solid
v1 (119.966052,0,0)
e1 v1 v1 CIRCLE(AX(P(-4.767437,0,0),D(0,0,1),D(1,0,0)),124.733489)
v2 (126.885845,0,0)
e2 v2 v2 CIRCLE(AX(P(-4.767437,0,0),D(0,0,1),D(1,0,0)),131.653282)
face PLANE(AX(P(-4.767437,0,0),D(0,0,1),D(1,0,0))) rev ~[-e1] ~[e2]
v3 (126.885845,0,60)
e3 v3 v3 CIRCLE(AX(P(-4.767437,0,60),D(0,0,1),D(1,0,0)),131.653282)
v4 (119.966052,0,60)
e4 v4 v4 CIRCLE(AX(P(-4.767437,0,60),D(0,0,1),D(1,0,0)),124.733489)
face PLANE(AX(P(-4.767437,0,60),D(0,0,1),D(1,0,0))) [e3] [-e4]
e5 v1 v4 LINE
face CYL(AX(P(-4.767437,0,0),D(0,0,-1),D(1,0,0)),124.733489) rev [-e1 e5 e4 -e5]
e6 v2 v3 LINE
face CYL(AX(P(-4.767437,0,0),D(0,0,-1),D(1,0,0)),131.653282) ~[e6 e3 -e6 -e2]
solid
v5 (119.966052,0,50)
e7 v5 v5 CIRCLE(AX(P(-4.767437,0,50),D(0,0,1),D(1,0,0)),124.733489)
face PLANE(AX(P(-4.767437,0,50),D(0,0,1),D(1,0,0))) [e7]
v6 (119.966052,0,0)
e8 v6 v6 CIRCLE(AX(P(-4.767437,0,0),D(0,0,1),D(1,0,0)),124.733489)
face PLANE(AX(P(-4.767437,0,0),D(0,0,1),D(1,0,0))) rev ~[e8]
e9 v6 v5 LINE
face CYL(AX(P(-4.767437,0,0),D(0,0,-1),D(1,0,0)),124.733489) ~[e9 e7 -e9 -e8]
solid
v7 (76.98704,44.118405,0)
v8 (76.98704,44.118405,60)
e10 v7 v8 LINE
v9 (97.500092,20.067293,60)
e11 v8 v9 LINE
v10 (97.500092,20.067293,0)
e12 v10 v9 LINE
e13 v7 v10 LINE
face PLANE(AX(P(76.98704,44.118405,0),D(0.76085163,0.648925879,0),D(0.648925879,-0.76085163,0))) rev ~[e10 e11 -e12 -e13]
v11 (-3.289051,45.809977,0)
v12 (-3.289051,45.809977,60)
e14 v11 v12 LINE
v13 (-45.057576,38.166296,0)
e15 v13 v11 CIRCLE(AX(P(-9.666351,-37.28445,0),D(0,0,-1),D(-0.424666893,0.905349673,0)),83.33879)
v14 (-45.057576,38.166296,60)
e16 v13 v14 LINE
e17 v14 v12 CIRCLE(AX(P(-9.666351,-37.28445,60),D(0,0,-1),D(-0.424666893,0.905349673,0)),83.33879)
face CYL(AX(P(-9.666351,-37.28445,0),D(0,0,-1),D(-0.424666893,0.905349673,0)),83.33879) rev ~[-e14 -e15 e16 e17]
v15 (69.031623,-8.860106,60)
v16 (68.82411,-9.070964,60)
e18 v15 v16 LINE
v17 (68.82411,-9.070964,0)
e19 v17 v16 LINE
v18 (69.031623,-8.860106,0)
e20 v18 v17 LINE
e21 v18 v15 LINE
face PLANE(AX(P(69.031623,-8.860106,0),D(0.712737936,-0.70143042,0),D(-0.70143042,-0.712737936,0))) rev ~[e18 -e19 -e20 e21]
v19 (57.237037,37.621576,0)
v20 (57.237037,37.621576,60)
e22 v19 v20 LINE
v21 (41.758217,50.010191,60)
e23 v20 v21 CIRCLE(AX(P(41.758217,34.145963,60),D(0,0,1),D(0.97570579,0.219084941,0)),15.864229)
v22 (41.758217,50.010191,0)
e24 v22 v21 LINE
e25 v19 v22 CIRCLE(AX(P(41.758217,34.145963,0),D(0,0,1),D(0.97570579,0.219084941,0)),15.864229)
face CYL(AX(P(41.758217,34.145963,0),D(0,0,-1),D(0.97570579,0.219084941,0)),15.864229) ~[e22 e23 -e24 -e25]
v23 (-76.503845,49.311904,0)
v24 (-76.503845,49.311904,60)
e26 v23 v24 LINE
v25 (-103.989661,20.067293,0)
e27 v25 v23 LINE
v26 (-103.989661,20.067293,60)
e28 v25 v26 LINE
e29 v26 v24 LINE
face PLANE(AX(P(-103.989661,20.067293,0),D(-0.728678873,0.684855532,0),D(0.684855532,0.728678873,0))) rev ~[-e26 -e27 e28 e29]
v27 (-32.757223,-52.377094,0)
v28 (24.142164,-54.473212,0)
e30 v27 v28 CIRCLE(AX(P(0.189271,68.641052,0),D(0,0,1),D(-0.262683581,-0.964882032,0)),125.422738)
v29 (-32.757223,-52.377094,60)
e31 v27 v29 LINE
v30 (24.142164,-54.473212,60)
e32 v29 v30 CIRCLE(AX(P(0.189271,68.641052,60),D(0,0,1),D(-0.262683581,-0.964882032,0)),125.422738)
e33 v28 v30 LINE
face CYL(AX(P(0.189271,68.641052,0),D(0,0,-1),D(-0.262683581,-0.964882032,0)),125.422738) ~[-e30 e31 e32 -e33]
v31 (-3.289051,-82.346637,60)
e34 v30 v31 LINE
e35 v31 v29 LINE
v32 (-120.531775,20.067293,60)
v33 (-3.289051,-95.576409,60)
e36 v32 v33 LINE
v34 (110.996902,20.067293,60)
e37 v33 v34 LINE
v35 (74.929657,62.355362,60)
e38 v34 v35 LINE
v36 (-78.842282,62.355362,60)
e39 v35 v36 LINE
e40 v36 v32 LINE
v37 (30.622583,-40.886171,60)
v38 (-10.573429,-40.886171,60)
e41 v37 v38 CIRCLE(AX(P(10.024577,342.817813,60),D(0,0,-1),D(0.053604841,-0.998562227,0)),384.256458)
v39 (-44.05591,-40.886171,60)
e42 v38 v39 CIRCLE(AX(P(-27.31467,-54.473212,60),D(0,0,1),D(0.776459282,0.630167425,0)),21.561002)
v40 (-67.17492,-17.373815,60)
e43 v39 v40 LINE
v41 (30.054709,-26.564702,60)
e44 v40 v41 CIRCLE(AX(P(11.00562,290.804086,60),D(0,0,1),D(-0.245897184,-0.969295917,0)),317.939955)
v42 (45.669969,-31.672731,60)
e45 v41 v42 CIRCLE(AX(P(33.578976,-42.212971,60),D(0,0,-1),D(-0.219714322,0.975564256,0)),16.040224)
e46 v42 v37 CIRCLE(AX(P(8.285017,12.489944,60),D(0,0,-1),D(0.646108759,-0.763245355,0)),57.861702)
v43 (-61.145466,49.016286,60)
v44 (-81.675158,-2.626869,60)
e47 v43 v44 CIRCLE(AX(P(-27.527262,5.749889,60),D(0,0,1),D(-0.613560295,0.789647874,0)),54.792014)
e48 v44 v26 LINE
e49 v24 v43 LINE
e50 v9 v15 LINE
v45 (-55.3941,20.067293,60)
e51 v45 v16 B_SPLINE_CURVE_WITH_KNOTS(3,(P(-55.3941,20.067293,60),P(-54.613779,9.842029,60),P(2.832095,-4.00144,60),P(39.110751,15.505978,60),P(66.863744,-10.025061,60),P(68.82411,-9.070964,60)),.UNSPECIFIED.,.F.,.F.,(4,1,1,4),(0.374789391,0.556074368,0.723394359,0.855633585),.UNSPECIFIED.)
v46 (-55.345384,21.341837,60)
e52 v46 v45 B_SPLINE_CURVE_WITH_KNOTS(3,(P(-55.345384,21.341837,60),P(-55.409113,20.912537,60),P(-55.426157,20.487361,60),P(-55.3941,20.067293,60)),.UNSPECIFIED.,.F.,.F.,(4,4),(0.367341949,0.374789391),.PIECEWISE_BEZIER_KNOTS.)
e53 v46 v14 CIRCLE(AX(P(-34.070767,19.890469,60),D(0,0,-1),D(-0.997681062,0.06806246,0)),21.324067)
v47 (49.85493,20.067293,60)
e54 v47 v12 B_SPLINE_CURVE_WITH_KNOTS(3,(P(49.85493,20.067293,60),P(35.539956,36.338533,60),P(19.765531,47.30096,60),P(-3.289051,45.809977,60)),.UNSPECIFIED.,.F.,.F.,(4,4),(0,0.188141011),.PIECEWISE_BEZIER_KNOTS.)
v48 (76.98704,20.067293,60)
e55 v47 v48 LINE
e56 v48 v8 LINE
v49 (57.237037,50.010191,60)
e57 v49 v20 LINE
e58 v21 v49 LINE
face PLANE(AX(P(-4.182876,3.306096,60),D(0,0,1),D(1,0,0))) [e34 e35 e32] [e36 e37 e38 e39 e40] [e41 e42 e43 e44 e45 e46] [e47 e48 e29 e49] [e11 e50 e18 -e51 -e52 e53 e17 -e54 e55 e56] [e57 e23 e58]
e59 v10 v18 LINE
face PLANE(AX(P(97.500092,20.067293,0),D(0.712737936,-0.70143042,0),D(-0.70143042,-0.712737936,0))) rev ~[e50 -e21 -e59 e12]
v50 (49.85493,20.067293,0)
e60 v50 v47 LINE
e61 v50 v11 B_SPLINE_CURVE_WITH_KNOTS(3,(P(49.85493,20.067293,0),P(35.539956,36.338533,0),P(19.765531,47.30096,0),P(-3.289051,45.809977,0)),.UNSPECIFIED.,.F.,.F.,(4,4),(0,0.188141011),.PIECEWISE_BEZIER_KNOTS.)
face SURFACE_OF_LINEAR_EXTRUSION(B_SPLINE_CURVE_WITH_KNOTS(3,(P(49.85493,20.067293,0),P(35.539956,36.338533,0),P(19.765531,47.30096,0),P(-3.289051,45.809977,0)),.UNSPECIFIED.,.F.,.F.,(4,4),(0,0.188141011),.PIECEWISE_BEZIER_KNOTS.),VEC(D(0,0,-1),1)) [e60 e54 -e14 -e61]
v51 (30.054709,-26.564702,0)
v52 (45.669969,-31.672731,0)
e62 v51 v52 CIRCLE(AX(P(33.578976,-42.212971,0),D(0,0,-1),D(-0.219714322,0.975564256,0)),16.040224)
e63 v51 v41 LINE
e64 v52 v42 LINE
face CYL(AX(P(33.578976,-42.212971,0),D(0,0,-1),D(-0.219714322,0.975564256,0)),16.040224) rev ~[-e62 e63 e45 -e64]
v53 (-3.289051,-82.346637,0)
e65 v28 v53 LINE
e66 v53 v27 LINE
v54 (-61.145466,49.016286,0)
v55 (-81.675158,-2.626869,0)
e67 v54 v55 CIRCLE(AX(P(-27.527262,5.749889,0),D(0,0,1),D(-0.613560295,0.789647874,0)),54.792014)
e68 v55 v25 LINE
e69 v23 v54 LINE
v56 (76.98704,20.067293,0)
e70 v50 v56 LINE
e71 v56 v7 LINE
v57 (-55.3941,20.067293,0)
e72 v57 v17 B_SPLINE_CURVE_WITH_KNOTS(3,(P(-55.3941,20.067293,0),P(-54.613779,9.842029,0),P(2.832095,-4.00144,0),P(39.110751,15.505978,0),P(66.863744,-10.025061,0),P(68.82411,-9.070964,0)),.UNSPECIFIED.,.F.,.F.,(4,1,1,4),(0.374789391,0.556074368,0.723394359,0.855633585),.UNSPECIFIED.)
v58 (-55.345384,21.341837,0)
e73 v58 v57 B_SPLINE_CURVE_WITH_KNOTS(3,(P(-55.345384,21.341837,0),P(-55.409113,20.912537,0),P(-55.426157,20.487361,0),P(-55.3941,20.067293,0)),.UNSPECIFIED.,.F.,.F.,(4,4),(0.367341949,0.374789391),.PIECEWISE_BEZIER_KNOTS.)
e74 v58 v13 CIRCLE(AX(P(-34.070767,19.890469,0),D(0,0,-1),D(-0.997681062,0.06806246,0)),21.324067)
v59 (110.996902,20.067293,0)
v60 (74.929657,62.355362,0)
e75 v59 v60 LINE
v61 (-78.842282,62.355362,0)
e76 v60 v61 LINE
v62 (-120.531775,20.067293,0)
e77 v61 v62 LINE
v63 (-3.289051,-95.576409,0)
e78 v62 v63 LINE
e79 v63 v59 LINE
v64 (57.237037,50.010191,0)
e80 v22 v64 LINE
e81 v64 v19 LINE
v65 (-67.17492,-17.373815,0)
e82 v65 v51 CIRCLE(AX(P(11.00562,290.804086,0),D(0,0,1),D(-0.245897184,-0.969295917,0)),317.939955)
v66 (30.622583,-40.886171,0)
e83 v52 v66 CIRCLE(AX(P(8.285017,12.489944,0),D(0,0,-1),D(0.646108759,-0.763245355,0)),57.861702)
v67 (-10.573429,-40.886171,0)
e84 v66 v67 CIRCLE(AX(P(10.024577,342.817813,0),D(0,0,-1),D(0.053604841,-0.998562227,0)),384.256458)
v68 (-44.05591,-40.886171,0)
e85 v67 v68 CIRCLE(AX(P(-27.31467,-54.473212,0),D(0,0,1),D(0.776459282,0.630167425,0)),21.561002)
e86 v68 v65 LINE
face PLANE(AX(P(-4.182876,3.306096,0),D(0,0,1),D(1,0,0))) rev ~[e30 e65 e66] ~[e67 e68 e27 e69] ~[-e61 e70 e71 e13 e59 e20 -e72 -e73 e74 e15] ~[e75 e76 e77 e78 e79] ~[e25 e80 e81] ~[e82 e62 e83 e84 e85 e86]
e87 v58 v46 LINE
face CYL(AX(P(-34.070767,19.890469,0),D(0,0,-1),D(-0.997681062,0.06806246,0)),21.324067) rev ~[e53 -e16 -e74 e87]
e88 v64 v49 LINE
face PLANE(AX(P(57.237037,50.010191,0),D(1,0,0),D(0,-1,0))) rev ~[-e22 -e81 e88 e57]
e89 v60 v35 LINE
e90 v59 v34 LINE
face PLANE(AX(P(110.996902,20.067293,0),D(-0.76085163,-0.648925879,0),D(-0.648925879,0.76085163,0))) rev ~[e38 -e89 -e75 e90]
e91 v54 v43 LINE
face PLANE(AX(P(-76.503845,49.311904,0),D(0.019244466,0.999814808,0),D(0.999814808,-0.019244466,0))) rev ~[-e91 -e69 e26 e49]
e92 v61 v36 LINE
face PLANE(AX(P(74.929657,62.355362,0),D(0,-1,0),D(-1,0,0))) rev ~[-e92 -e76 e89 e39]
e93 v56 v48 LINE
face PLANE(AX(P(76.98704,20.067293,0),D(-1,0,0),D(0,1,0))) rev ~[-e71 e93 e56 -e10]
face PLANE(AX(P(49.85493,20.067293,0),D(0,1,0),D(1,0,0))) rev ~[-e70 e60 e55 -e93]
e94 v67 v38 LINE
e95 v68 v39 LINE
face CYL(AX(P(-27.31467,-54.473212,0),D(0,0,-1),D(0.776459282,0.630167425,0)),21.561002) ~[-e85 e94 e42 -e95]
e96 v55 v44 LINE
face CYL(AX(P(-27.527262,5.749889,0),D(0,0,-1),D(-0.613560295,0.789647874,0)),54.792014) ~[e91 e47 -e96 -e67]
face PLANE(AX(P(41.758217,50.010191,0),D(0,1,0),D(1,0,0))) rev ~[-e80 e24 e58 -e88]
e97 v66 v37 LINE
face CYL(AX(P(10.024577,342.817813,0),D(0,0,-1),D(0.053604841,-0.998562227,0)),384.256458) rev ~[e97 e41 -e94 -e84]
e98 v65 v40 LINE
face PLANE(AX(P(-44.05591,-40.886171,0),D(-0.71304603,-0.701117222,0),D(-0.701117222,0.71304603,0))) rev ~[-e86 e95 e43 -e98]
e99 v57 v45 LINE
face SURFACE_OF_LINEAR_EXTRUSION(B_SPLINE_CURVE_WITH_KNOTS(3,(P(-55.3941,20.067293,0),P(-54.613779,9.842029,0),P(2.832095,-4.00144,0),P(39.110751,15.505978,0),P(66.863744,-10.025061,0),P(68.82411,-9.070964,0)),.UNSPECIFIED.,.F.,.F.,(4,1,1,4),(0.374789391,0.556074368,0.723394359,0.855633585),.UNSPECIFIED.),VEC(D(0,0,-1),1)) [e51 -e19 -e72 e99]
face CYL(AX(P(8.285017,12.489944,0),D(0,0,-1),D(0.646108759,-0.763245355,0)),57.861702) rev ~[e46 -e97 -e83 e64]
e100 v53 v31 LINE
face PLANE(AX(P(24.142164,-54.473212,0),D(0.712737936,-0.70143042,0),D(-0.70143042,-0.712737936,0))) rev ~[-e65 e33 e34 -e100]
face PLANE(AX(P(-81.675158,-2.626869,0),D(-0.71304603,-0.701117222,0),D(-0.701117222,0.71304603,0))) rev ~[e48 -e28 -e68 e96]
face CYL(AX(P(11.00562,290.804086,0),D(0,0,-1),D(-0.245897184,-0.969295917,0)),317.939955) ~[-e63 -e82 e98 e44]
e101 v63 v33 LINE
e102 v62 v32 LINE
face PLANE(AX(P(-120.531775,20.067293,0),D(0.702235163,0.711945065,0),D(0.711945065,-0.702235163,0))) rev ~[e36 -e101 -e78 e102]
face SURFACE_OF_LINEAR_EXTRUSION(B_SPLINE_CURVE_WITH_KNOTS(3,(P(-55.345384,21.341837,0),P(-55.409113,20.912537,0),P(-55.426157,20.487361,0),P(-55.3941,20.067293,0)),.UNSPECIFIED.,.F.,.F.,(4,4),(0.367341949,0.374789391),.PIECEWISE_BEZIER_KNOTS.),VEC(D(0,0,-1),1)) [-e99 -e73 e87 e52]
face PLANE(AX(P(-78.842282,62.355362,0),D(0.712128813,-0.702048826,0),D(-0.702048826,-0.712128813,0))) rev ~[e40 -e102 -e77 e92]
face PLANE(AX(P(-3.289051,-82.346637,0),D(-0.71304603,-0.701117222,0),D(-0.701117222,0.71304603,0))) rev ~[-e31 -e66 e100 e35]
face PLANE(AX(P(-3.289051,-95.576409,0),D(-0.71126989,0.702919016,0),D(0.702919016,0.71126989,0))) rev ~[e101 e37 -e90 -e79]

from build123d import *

# Parameters (mm, degrees)
F1_DEPTH = 60
F2_R     = 131.6532822565
F2_R_2   = 124.7334894873
F3_DEPTH = 60
F4_DEPTH = 50


with BuildPart() as f1:
    # F0 (on Top) → F1 (new body)
    with BuildSketch(Plane.XY):
        Polygon((74.9296570044, 62.355361724), (-78.8422822756, 62.355361724), (-120.5317750377, 20.0672930421), (-3.2890513343, -95.5764094054), (110.9969020086, 20.0672930421), align=None)
        with BuildLine():
            ThreePointArc((30.6225829023, -40.886171317), (10.024576741, -41.4386449004), (-10.5734294202, -40.886171317))
            ThreePointArc((-10.5734294202, -40.886171317), (-27.3146695696, -32.9122104229), (-44.055909719, -40.886171317))
            Line((-44.055909719, -40.886171317), (-67.174919563, -17.3738146812))
            ThreePointArc((-67.174919563, -17.3738146812), (-18.9151123365, -25.7248463855), (30.0547086439, -26.5647018575))
            ThreePointArc((30.0547086439, -26.5647018575), (38.5659779212, -26.967690046), (45.6699691909, -31.6727311968))
            ThreePointArc((45.6699691909, -31.6727311968), (38.4995277759, -36.8563818233), (30.6225829023, -40.886171317))
        make_face(mode=Mode.SUBTRACT)
        with BuildLine():
            Line((24.142164092, -54.4732124549), (-3.2890513343, -82.3466369568))
            Line((-3.2890513343, -82.3466369568), (-32.7572226476, -52.3770942299))
            ThreePointArc((-32.7572226476, -52.3770942299), (-4.428048629, -56.6966659367), (24.142164092, -54.4732124549))
        make_face(mode=Mode.SUBTRACT)
        with BuildLine():
            Line((-81.67515814, -2.6268690711), (-103.989661336, 20.0672930421))
            Line((-103.989661336, 20.0672930421), (-76.5038450393, 49.3119040818))
            Line((-76.5038450393, 49.3119040818), (-61.1454658014, 49.0162855328))
            ThreePointArc((-61.1454658014, 49.0162855328), (-78.4436240705, 25.9906593039), (-81.67515814, -2.6268690711))
        make_face(mode=Mode.SUBTRACT)
        with BuildLine():
            Line((76.9870403049, 20.0672930421), (76.9870403049, 44.1184047228))
            Line((76.9870403049, 44.1184047228), (97.5000919682, 20.0672930421))
            Line((97.5000919682, 20.0672930421), (69.0316228459, -8.8601063616))
            add(Edge.make_bspline(
                [(68.8241100173, -9.0709644323), (68.9152133704, -9.0266250767), (68.9840910354, -8.9558840502), (69.0316228459, -8.8601063616)],
                knots=[0.8556335845, 0.8556335845, 0.8556335845, 0.8556335845, 0.8617790869, 0.8617790869, 0.8617790869, 0.8617790869], degree=3))
            add(Edge.make_bspline(
                [(-55.3941001687, 20.0672930421), (-54.6137788828, 9.8420286504), (2.8320946288, -4.0014398965), (39.1107514545, 15.5059780363), (66.8637435516, -10.0250608833), (68.8241100173, -9.0709644323)],
                knots=[0.3747893908, 0.3747893908, 0.3747893908, 0.3747893908, 0.5560743676, 0.723394359, 0.8556335845, 0.8556335845, 0.8556335845, 0.8556335845], degree=3))
            add(Edge.make_bspline(
                [(-55.3453841257, 21.3418374189), (-55.4091134145, 20.912536879), (-55.4261568649, 20.4873612884), (-55.3941001687, 20.0672930421)],
                knots=[0.367341949, 0.367341949, 0.367341949, 0.367341949, 0.3747893908, 0.3747893908, 0.3747893908, 0.3747893908], degree=3))
            ThreePointArc((-55.3453841257, 21.3418374189), (-52.2632242925, 31.0147803908), (-45.0575761301, 38.1662955822))
            ThreePointArc((-45.0575761301, 38.1662955822), (-24.6682987221, 44.6929576974), (-3.2890513343, 45.8099772682))
            add(Edge.make_bspline(
                [(49.8549297409, 20.0672930421), (35.5399556775, 36.338533457), (19.7655314176, 47.3009599168), (-3.2890513343, 45.8099772682)],
                knots=[0, 0, 0, 0, 0.1881410109, 0.1881410109, 0.1881410109, 0.1881410109], degree=3))
            Line((49.8549297409, 20.0672930421), (76.9870403049, 20.0672930421))
        make_face(mode=Mode.SUBTRACT)
        with BuildLine():
            ThreePointArc((57.2370365458, 37.6215761842), (51.6712340933, 46.5316736156), (41.7582169371, 50.0101911218))
            Line((41.7582169371, 50.0101911218), (57.2370365458, 50.0101911218))
            Line((57.2370365458, 50.0101911218), (57.2370365458, 37.6215761842))
        make_face(mode=Mode.SUBTRACT)
        with BuildLine():
            add(Edge.make_bspline(
                [(68.8241100173, -9.0709644323), (68.9152133704, -9.0266250767), (68.9840910354, -8.9558840502), (69.0316228459, -8.8601063616)],
                knots=[0.8556335845, 0.8556335845, 0.8556335845, 0.8556335845, 0.8617790869, 0.8617790869, 0.8617790869, 0.8617790869], degree=3))
            Line((69.0316228459, -8.8601063616), (68.8241100173, -9.0709644323))
        make_face()
    extrude(amount=F1_DEPTH)


with BuildPart() as f3:
    # F2 (on Top) → F3 (new body)
    with BuildSketch(Plane.XY):
        with Locations((-4.7674374655, 0)):
            Circle(F2_R)
        with Locations((-4.7674374655, 0)):
            Circle(F2_R_2, mode=Mode.SUBTRACT)
    extrude(amount=F3_DEPTH)


with BuildPart() as f4:
    # F2 (on Top) → F4 (new body)
    with BuildSketch(Plane.XY):
        with Locations((-4.7674374655, 0)):
            Circle(F2_R_2)
    extrude(amount=F4_DEPTH)


solid = Compound([f1.part, f3.part, f4.part])
